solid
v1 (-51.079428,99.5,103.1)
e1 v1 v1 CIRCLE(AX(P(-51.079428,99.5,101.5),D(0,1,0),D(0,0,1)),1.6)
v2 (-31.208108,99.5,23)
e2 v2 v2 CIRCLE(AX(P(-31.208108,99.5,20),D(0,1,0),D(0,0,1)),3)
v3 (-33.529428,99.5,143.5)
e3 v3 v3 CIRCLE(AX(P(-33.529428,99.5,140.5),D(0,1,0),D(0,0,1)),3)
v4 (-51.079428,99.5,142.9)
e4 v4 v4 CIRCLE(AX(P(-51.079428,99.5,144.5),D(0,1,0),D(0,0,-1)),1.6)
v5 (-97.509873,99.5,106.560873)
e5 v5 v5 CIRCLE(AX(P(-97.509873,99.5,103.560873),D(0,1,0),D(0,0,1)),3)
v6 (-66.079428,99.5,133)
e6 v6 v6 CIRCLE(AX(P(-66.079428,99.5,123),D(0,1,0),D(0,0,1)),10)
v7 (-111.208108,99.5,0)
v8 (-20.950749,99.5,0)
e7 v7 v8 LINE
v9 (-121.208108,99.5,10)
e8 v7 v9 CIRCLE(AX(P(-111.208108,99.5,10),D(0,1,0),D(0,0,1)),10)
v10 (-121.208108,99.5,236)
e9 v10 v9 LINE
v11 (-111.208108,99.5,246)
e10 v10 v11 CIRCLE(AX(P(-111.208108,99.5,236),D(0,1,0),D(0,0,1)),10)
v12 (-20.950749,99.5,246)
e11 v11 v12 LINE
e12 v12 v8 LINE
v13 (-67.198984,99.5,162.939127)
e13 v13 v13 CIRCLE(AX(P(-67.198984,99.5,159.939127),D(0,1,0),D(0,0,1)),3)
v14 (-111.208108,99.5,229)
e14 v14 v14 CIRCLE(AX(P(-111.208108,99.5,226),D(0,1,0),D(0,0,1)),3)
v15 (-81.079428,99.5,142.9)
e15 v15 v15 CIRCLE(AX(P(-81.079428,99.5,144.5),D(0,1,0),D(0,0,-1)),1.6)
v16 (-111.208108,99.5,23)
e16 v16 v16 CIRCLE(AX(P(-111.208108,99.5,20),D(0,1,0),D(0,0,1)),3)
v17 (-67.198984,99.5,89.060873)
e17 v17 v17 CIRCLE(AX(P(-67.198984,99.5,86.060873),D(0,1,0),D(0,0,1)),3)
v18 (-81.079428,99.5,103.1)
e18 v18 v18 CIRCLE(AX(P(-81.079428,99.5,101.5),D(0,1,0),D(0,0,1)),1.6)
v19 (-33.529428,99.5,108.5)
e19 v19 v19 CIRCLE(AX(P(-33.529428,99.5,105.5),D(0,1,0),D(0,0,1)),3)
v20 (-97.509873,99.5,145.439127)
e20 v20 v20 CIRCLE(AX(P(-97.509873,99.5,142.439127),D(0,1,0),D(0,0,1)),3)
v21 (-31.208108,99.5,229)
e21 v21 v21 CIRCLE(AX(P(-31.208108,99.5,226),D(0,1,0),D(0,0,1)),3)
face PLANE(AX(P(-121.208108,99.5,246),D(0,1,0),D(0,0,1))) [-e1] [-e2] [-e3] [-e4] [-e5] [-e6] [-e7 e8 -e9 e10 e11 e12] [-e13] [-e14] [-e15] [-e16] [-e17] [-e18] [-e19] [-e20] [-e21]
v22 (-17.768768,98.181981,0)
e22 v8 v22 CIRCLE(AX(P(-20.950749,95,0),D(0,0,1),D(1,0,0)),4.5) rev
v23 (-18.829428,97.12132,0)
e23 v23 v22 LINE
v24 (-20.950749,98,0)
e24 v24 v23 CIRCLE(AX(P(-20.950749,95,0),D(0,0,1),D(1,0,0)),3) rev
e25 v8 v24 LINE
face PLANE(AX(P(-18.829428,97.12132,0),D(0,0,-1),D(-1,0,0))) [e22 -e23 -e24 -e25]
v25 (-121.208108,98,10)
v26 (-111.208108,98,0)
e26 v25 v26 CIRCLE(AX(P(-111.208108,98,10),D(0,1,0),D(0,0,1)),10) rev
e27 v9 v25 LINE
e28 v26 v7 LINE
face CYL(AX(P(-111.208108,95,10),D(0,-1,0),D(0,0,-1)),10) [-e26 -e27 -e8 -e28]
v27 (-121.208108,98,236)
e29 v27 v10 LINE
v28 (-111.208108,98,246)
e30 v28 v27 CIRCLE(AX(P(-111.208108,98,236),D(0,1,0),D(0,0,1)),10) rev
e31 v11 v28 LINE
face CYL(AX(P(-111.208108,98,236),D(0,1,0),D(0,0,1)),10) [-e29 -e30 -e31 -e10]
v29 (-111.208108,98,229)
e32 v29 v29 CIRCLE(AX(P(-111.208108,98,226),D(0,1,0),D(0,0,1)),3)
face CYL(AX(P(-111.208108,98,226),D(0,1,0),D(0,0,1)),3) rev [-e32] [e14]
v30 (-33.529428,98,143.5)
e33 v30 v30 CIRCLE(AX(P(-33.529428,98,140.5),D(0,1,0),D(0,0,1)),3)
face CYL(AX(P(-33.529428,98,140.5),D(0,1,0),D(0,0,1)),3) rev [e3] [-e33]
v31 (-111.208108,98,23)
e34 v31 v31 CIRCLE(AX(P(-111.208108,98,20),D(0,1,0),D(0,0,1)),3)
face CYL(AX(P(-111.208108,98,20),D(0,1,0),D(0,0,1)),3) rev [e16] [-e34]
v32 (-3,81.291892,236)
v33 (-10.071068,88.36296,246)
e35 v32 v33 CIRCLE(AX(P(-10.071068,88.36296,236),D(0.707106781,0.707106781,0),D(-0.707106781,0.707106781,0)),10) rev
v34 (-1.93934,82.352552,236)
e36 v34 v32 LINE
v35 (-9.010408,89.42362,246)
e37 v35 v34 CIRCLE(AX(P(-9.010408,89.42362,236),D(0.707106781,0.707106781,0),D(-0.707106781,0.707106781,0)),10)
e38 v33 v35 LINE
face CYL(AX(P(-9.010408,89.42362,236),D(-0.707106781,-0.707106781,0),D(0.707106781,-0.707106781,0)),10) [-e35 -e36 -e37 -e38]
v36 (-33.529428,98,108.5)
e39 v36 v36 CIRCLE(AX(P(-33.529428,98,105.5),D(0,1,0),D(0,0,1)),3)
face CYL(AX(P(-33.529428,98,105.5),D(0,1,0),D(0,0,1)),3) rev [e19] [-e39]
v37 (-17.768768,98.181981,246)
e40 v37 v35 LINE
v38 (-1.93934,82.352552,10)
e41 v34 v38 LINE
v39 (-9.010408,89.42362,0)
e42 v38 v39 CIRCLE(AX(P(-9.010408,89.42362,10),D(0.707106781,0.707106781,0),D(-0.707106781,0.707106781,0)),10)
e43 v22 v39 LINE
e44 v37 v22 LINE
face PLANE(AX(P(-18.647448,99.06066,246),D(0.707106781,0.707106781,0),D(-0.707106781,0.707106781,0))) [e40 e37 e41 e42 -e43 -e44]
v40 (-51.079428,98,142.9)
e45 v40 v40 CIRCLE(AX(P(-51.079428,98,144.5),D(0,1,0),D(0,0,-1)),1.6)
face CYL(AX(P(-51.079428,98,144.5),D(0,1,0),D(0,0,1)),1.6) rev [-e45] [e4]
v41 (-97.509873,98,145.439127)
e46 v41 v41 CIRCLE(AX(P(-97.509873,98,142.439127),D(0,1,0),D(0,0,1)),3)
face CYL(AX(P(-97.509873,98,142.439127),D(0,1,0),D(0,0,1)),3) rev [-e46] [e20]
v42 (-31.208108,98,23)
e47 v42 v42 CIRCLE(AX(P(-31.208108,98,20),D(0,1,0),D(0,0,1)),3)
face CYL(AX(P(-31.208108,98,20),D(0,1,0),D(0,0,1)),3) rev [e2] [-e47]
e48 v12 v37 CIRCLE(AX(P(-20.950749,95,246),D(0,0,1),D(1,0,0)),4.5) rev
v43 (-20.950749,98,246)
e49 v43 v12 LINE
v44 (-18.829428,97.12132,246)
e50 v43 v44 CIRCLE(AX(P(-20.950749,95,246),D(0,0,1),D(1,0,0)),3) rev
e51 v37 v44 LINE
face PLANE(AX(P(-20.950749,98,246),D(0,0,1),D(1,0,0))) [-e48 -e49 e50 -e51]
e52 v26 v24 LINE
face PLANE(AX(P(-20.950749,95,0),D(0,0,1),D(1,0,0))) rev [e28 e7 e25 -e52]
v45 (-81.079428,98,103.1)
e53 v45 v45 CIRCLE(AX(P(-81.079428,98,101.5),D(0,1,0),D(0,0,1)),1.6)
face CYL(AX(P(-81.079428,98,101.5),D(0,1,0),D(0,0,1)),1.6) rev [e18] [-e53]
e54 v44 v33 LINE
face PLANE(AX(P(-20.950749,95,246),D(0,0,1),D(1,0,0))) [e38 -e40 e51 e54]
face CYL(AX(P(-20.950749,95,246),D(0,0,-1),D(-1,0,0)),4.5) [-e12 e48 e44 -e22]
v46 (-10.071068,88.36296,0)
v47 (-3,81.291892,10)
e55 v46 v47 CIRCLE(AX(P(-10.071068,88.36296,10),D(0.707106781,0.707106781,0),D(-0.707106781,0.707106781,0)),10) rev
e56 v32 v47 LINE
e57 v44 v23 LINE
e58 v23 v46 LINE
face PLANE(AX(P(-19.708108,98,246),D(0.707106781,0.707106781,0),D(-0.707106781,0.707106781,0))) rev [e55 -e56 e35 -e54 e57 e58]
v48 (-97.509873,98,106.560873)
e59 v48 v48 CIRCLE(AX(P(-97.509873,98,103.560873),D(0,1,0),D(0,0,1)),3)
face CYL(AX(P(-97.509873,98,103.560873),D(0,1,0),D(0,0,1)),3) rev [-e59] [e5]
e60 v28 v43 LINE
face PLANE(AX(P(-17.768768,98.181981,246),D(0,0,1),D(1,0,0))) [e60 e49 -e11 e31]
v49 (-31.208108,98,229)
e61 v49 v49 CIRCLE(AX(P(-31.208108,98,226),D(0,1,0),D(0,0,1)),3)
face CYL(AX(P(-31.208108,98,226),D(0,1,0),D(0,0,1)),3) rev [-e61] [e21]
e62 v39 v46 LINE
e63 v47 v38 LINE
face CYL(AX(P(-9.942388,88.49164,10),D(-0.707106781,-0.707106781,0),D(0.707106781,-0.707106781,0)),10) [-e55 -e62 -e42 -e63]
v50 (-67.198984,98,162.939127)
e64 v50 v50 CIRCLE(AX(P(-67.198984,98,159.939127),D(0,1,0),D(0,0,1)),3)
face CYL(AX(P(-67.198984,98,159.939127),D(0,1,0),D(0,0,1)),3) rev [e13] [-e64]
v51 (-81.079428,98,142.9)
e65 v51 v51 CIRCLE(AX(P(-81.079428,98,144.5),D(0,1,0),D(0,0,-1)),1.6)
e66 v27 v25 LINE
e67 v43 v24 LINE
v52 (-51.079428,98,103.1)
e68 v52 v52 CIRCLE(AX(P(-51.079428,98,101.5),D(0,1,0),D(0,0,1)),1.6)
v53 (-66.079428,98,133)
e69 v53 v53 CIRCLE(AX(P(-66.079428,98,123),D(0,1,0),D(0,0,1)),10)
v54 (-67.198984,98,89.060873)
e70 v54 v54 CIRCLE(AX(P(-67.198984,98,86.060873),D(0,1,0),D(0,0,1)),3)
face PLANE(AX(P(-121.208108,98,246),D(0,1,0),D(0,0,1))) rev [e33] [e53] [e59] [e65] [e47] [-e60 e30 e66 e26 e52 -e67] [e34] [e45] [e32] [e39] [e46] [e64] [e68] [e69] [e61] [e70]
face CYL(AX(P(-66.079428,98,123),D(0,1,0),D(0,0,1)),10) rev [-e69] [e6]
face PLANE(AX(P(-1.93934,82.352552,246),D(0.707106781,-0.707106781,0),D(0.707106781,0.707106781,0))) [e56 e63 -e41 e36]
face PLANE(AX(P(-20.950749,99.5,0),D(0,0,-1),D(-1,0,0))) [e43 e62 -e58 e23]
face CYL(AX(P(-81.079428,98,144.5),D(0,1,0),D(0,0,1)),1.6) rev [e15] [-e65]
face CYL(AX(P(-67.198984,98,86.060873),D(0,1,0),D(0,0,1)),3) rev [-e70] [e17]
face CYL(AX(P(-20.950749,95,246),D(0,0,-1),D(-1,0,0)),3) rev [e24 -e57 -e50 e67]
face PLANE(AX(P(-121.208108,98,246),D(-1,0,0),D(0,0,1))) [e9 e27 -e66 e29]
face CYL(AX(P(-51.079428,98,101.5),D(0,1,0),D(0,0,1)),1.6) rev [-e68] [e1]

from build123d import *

# Parameters (mm, degrees)
BASE_FLANGE1_DEPTH = 246
FILLET1_R          = 10
SKETCH7_R          = 3
CUT_EXTRUDE1_DEPTH = 1.5
SKETCH8_R          = 10
SKETCH8_R_2        = 1.6
CUT_EXTRUDE2_DEPTH = 1.5
SKETCH9_R          = 3
CUT_EXTRUDE3_DEPTH = 10


# Sheet-metal steps are written as plain solids
with BuildPart() as part:
    # Sketch1 → Base-Flange1 (new body)
    with BuildSketch(Plane.XY):
        with BuildLine():
            Line((-121.208107966, 98), (-20.950748653, 98))
            ThreePointArc((-20.950748653, 98), (-19.802698356, 97.771638598), (-18.829428309, 97.121320344))
            Line((-18.829428309, 97.121320344), (-3, 81.291892034))
            Line((-3, 81.291892034), (-1.939339828, 82.352552206))
            Line((-1.939339828, 82.352552206), (-17.768768137, 98.181980515))
            ThreePointArc((-17.768768137, 98.181980515), (-19.228673207, 99.157457896), (-20.950748653, 99.5))
            Line((-20.950748653, 99.5), (-121.208107966, 99.5))
            Line((-121.208107966, 99.5), (-121.208107966, 98))
        make_face()
    extrude(amount=BASE_FLANGE1_DEPTH)

    # Fillet1
    fillet1_edges = [part.edges().sort_by_distance(p)[0] for p in [
        (-121.208107966, 98.75, 246),
        (-121.208107966, 98.75, 0),
        (-2.469669914, 81.82222212, 246),
        (-2.469669914, 81.82222212, 0),
    ]]
    fillet(fillet1_edges, radius=FILLET1_R)

    # Sketch7 → Cut-Extrude1 (cut)
    with BuildSketch(Plane(origin=(0, 99.5, 0), x_dir=(1, 0, 0), z_dir=(0, 1, 0))):
        with Locations(Location((-111.208107966, -20, 0), (0, 0, 270))):
            Circle(SKETCH7_R)
        with Locations(Location((-31.208107966, -20, 0), (0, 0, 270))):
            Circle(SKETCH7_R)
        with Locations(Location((-31.208107966, -226, 0), (0, 0, 270))):
            Circle(SKETCH7_R)
        with Locations(Location((-111.208107966, -226, 0), (0, 0, 270))):
            Circle(SKETCH7_R)
    extrude(amount=-CUT_EXTRUDE1_DEPTH, mode=Mode.SUBTRACT)

    # Sketch8 → Cut-Extrude2 (cut)
    with BuildSketch(Plane(origin=(0, 99.5, 0), x_dir=(1, 0, 0), z_dir=(0, 1, 0))):
        with Locations(Location((-66.079428309, -123, 0), (0, 0, 270))):
            Circle(SKETCH8_R)
        with Locations(Location((-51.079428309, -101.5, 0), (0, 0, 270))):
            Circle(SKETCH8_R_2)
        with Locations(Location((-81.079428309, -101.5, 0), (0, 0, 270))):
            Circle(SKETCH8_R_2)
        with Locations(Location((-81.079428309, -144.5, 0), (0, 0, 90))):
            Circle(SKETCH8_R_2)
        with Locations(Location((-51.079428309, -144.5, 0), (0, 0, 90))):
            Circle(SKETCH8_R_2)
    extrude(amount=-CUT_EXTRUDE2_DEPTH, mode=Mode.SUBTRACT)

    # Sketch9 → Cut-Extrude3 (cut)
    with BuildSketch(Plane(origin=(0, 99.5, 0), x_dir=(1, 0, 0), z_dir=(0, 1, 0))):
        with Locations(Location((-33.529428309, -105.5, 0), (0, 0, 270))):
            Circle(SKETCH9_R)
        with Locations(Location((-33.529428309, -140.5, 0), (0, 0, 270))):
            Circle(SKETCH9_R)
        with Locations(Location((-67.198983743, -159.939126893, 0), (0, 0, 270))):
            Circle(SKETCH9_R)
        with Locations(Location((-97.509872875, -142.439126893, 0), (0, 0, 270))):
            Circle(SKETCH9_R)
        with Locations(Location((-97.509872875, -103.560873107, 0), (0, 0, 270))):
            Circle(SKETCH9_R)
        with Locations(Location((-67.198983743, -86.060873107, 0), (0, 0, 270))):
            Circle(SKETCH9_R)
    extrude(amount=-CUT_EXTRUDE3_DEPTH, mode=Mode.SUBTRACT)


solid = part.part
